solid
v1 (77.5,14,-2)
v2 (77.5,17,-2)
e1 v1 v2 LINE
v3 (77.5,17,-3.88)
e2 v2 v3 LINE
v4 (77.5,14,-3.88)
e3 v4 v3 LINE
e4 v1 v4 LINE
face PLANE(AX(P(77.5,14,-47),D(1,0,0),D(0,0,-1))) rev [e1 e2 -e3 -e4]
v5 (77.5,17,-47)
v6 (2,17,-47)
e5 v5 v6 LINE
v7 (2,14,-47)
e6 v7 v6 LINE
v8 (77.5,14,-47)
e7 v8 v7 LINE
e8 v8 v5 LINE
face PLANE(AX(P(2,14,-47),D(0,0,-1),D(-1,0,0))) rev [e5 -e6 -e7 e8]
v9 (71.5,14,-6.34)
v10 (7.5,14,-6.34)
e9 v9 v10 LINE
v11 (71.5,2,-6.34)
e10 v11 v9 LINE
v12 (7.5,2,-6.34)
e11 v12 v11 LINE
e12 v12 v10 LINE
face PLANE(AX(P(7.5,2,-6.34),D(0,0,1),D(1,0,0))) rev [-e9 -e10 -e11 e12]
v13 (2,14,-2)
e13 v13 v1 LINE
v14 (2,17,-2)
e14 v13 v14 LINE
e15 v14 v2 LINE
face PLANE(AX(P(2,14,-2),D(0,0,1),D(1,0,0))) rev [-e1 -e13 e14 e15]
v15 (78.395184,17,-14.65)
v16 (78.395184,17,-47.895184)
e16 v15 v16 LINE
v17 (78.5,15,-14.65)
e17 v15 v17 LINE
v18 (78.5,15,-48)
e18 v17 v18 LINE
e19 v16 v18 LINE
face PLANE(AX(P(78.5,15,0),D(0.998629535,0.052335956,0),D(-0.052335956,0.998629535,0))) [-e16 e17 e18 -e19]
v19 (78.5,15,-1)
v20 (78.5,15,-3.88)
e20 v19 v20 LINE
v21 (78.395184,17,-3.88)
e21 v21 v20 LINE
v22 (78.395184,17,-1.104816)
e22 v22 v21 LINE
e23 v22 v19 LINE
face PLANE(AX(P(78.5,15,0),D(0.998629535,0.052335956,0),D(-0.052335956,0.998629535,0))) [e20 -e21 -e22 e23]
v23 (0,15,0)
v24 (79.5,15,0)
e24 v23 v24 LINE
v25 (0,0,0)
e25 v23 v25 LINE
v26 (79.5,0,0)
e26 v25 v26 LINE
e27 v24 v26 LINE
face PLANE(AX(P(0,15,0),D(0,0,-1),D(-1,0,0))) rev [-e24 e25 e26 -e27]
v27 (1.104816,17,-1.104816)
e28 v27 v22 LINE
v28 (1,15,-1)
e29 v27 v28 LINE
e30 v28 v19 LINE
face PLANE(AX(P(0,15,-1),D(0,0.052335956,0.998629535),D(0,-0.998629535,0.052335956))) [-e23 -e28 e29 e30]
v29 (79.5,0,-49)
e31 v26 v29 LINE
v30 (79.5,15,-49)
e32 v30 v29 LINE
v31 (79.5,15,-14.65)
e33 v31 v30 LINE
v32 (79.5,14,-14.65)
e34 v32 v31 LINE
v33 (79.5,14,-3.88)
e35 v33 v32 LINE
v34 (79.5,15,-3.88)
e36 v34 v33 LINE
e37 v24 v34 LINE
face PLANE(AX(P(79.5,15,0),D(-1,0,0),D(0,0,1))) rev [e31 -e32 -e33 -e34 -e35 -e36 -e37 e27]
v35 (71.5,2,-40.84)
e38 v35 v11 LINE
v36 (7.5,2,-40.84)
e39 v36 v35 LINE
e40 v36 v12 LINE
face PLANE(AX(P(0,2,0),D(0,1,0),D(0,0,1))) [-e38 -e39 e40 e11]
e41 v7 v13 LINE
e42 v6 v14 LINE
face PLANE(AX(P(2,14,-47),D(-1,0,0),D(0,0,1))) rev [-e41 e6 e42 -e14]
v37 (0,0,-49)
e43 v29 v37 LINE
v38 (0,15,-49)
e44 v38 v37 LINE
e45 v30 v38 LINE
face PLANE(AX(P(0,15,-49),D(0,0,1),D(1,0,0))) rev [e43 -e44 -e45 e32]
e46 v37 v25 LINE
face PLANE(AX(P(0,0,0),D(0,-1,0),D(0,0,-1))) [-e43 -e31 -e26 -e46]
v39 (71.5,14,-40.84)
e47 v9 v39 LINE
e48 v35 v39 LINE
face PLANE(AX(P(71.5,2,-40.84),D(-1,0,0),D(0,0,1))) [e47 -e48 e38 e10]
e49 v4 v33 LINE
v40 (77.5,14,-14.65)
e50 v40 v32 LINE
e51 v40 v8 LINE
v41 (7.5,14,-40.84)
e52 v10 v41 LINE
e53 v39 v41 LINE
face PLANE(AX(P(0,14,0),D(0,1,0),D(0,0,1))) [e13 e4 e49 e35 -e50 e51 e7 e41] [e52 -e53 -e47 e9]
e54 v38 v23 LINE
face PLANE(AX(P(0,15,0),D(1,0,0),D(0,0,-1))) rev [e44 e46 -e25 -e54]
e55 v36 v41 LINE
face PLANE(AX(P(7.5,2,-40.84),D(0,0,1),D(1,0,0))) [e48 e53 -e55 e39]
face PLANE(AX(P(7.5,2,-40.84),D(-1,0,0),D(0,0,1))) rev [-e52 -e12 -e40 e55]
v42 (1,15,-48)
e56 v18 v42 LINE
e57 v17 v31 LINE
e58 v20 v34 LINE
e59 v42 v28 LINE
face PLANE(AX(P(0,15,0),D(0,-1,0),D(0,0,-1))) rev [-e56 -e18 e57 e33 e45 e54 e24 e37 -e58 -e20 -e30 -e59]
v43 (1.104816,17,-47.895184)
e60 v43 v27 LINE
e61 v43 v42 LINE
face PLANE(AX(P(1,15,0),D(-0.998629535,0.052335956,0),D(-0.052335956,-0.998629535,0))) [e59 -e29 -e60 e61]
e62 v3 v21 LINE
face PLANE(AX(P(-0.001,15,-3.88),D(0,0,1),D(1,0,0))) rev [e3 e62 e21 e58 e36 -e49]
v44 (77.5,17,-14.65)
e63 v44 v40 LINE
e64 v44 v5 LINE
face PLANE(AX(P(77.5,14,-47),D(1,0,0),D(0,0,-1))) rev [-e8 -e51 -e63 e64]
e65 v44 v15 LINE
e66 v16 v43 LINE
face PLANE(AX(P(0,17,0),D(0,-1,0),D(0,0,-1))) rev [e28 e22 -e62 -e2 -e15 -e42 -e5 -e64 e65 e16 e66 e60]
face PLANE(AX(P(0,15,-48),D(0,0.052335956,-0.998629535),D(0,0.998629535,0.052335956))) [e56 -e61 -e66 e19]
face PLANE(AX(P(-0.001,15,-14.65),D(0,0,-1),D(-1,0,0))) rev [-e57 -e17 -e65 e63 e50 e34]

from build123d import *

# Parameters (mm, degrees)
SKETCH1_W           = 79.5
SKETCH1_H           = 49
BOSS_EXTRUDE1_DEPTH = 15
SKETCH2_W           = 64
SKETCH2_H           = 34.5
CUT_EXTRUDE1_DEPTH  = 13
SKETCH3_W           = 75.5
SKETCH3_H           = 45
CUT_EXTRUDE2_DEPTH  = 1
CUT_EXTRUDE3_REACH  = 96.585
SKETCH5_W           = 10.77
SKETCH5_H           = 1
LIP1_START          = -48
LIP1_DEPTH          = 1
LIP1_START_2        = -2
LIP1_2_DEPTH        = 1
LIP1_START_3        = -47
LIP1_3_DEPTH        = 32.35
LIP1_START_4        = -14.65
LIP1_4_DEPTH        = 12.65
LIP1_START_5        = -3.88
LIP1_5_DEPTH        = 1.88
LIP1_6_DEPTH        = 79


with BuildPart() as part:
    # Sketch1 → Boss-Extrude1 (new body)
    with BuildSketch(Plane(origin=(0, 0, 0), x_dir=(1, 0, 0), z_dir=(0, 1, 0))):
        with Locations((39.75, 24.5)):
            Rectangle(SKETCH1_W, SKETCH1_H)
    extrude(amount=BOSS_EXTRUDE1_DEPTH)

    # Sketch2 → Cut-Extrude1 (cut)
    with BuildSketch(Plane(origin=(0, 15, 0), x_dir=(1, 0, 0), z_dir=(0, 1, 0))):
        with Locations((39.5, 23.59)):
            Rectangle(SKETCH2_W, SKETCH2_H)
    extrude(amount=-CUT_EXTRUDE1_DEPTH, mode=Mode.SUBTRACT)

    # Sketch3 → Cut-Extrude2 (cut)
    with BuildSketch(Plane(origin=(0, 15, 0), x_dir=(1, 0, 0), z_dir=(0, 1, 0))):
        with Locations((39.75, 24.5)):
            Rectangle(SKETCH3_W, SKETCH3_H)
    extrude(amount=-CUT_EXTRUDE2_DEPTH, mode=Mode.SUBTRACT)

    # Sketch5 → Cut-Extrude3 (cut, up to next)
    with BuildSketch(Plane(origin=(79.5, 0, 0), x_dir=(0, 0, -1), z_dir=(1, 0, 0)), mode=Mode.PRIVATE) as cut_extrude3_sk1:
        with Locations((9.265, 14.5)):
            Rectangle(SKETCH5_W, SKETCH5_H)
    cut_extrude3_tool1 = extrude(cut_extrude3_sk1.sketch, amount=-CUT_EXTRUDE3_REACH, mode=Mode.PRIVATE) & part.part
    add(cut_extrude3_tool1.solids().sort_by_distance((79.5, 14.5, -9.265))[0], mode=Mode.SUBTRACT)

    # Lip1: read off the stored shape, not the designer's step
    # Lip1 outline → Lip1 (add)
    with BuildSketch(Plane.XY.offset(LIP1_START)):
        Polygon((78.5, 15), (78.395184441, 17), (1.104815559, 17), (1, 15), align=None)
    extrude(amount=LIP1_DEPTH)

    # Lip1 2 outline → Lip1 2 (add)
    with BuildSketch(Plane.XY.offset(LIP1_START_2)):
        Polygon((78.5, 15), (78.395184441, 17), (1.104815559, 17), (1, 15), align=None)
    extrude(amount=LIP1_2_DEPTH)

    # Lip1 3 outline → Lip1 3 (add)
    with BuildSketch(Plane.XY.offset(LIP1_START_3)):
        Polygon((77.5, 17), (77.5, 15), (78.5, 15), (78.395184441, 17), align=None)
        Polygon((1, 15), (2, 15), (2, 17), (1.104815559, 17), align=None)
    extrude(amount=LIP1_3_DEPTH)

    # Lip1 4 outline → Lip1 4 (add)
    with BuildSketch(Plane.XY.offset(LIP1_START_4)):
        Polygon((1, 15), (2, 15), (2, 17), (1.104815559, 17), align=None)
    extrude(amount=LIP1_4_DEPTH)

    # Lip1 5 outline → Lip1 5 (add)
    with BuildSketch(Plane.XY.offset(LIP1_START_5)):
        Polygon((77.5, 17), (77.5, 15), (78.5, 15), (78.395184441, 17), align=None)
    extrude(amount=LIP1_5_DEPTH)

    # Lip1 6 outline → Lip1 6 (cut)
    with BuildSketch(Plane.YZ):
        Polygon((17, -48), (17, -47.895184441), (15, -48), align=None)
        Polygon((15, -1), (17, -1.104815559), (17, -1), align=None)
    extrude(amount=LIP1_6_DEPTH, mode=Mode.SUBTRACT)


solid = part.part
